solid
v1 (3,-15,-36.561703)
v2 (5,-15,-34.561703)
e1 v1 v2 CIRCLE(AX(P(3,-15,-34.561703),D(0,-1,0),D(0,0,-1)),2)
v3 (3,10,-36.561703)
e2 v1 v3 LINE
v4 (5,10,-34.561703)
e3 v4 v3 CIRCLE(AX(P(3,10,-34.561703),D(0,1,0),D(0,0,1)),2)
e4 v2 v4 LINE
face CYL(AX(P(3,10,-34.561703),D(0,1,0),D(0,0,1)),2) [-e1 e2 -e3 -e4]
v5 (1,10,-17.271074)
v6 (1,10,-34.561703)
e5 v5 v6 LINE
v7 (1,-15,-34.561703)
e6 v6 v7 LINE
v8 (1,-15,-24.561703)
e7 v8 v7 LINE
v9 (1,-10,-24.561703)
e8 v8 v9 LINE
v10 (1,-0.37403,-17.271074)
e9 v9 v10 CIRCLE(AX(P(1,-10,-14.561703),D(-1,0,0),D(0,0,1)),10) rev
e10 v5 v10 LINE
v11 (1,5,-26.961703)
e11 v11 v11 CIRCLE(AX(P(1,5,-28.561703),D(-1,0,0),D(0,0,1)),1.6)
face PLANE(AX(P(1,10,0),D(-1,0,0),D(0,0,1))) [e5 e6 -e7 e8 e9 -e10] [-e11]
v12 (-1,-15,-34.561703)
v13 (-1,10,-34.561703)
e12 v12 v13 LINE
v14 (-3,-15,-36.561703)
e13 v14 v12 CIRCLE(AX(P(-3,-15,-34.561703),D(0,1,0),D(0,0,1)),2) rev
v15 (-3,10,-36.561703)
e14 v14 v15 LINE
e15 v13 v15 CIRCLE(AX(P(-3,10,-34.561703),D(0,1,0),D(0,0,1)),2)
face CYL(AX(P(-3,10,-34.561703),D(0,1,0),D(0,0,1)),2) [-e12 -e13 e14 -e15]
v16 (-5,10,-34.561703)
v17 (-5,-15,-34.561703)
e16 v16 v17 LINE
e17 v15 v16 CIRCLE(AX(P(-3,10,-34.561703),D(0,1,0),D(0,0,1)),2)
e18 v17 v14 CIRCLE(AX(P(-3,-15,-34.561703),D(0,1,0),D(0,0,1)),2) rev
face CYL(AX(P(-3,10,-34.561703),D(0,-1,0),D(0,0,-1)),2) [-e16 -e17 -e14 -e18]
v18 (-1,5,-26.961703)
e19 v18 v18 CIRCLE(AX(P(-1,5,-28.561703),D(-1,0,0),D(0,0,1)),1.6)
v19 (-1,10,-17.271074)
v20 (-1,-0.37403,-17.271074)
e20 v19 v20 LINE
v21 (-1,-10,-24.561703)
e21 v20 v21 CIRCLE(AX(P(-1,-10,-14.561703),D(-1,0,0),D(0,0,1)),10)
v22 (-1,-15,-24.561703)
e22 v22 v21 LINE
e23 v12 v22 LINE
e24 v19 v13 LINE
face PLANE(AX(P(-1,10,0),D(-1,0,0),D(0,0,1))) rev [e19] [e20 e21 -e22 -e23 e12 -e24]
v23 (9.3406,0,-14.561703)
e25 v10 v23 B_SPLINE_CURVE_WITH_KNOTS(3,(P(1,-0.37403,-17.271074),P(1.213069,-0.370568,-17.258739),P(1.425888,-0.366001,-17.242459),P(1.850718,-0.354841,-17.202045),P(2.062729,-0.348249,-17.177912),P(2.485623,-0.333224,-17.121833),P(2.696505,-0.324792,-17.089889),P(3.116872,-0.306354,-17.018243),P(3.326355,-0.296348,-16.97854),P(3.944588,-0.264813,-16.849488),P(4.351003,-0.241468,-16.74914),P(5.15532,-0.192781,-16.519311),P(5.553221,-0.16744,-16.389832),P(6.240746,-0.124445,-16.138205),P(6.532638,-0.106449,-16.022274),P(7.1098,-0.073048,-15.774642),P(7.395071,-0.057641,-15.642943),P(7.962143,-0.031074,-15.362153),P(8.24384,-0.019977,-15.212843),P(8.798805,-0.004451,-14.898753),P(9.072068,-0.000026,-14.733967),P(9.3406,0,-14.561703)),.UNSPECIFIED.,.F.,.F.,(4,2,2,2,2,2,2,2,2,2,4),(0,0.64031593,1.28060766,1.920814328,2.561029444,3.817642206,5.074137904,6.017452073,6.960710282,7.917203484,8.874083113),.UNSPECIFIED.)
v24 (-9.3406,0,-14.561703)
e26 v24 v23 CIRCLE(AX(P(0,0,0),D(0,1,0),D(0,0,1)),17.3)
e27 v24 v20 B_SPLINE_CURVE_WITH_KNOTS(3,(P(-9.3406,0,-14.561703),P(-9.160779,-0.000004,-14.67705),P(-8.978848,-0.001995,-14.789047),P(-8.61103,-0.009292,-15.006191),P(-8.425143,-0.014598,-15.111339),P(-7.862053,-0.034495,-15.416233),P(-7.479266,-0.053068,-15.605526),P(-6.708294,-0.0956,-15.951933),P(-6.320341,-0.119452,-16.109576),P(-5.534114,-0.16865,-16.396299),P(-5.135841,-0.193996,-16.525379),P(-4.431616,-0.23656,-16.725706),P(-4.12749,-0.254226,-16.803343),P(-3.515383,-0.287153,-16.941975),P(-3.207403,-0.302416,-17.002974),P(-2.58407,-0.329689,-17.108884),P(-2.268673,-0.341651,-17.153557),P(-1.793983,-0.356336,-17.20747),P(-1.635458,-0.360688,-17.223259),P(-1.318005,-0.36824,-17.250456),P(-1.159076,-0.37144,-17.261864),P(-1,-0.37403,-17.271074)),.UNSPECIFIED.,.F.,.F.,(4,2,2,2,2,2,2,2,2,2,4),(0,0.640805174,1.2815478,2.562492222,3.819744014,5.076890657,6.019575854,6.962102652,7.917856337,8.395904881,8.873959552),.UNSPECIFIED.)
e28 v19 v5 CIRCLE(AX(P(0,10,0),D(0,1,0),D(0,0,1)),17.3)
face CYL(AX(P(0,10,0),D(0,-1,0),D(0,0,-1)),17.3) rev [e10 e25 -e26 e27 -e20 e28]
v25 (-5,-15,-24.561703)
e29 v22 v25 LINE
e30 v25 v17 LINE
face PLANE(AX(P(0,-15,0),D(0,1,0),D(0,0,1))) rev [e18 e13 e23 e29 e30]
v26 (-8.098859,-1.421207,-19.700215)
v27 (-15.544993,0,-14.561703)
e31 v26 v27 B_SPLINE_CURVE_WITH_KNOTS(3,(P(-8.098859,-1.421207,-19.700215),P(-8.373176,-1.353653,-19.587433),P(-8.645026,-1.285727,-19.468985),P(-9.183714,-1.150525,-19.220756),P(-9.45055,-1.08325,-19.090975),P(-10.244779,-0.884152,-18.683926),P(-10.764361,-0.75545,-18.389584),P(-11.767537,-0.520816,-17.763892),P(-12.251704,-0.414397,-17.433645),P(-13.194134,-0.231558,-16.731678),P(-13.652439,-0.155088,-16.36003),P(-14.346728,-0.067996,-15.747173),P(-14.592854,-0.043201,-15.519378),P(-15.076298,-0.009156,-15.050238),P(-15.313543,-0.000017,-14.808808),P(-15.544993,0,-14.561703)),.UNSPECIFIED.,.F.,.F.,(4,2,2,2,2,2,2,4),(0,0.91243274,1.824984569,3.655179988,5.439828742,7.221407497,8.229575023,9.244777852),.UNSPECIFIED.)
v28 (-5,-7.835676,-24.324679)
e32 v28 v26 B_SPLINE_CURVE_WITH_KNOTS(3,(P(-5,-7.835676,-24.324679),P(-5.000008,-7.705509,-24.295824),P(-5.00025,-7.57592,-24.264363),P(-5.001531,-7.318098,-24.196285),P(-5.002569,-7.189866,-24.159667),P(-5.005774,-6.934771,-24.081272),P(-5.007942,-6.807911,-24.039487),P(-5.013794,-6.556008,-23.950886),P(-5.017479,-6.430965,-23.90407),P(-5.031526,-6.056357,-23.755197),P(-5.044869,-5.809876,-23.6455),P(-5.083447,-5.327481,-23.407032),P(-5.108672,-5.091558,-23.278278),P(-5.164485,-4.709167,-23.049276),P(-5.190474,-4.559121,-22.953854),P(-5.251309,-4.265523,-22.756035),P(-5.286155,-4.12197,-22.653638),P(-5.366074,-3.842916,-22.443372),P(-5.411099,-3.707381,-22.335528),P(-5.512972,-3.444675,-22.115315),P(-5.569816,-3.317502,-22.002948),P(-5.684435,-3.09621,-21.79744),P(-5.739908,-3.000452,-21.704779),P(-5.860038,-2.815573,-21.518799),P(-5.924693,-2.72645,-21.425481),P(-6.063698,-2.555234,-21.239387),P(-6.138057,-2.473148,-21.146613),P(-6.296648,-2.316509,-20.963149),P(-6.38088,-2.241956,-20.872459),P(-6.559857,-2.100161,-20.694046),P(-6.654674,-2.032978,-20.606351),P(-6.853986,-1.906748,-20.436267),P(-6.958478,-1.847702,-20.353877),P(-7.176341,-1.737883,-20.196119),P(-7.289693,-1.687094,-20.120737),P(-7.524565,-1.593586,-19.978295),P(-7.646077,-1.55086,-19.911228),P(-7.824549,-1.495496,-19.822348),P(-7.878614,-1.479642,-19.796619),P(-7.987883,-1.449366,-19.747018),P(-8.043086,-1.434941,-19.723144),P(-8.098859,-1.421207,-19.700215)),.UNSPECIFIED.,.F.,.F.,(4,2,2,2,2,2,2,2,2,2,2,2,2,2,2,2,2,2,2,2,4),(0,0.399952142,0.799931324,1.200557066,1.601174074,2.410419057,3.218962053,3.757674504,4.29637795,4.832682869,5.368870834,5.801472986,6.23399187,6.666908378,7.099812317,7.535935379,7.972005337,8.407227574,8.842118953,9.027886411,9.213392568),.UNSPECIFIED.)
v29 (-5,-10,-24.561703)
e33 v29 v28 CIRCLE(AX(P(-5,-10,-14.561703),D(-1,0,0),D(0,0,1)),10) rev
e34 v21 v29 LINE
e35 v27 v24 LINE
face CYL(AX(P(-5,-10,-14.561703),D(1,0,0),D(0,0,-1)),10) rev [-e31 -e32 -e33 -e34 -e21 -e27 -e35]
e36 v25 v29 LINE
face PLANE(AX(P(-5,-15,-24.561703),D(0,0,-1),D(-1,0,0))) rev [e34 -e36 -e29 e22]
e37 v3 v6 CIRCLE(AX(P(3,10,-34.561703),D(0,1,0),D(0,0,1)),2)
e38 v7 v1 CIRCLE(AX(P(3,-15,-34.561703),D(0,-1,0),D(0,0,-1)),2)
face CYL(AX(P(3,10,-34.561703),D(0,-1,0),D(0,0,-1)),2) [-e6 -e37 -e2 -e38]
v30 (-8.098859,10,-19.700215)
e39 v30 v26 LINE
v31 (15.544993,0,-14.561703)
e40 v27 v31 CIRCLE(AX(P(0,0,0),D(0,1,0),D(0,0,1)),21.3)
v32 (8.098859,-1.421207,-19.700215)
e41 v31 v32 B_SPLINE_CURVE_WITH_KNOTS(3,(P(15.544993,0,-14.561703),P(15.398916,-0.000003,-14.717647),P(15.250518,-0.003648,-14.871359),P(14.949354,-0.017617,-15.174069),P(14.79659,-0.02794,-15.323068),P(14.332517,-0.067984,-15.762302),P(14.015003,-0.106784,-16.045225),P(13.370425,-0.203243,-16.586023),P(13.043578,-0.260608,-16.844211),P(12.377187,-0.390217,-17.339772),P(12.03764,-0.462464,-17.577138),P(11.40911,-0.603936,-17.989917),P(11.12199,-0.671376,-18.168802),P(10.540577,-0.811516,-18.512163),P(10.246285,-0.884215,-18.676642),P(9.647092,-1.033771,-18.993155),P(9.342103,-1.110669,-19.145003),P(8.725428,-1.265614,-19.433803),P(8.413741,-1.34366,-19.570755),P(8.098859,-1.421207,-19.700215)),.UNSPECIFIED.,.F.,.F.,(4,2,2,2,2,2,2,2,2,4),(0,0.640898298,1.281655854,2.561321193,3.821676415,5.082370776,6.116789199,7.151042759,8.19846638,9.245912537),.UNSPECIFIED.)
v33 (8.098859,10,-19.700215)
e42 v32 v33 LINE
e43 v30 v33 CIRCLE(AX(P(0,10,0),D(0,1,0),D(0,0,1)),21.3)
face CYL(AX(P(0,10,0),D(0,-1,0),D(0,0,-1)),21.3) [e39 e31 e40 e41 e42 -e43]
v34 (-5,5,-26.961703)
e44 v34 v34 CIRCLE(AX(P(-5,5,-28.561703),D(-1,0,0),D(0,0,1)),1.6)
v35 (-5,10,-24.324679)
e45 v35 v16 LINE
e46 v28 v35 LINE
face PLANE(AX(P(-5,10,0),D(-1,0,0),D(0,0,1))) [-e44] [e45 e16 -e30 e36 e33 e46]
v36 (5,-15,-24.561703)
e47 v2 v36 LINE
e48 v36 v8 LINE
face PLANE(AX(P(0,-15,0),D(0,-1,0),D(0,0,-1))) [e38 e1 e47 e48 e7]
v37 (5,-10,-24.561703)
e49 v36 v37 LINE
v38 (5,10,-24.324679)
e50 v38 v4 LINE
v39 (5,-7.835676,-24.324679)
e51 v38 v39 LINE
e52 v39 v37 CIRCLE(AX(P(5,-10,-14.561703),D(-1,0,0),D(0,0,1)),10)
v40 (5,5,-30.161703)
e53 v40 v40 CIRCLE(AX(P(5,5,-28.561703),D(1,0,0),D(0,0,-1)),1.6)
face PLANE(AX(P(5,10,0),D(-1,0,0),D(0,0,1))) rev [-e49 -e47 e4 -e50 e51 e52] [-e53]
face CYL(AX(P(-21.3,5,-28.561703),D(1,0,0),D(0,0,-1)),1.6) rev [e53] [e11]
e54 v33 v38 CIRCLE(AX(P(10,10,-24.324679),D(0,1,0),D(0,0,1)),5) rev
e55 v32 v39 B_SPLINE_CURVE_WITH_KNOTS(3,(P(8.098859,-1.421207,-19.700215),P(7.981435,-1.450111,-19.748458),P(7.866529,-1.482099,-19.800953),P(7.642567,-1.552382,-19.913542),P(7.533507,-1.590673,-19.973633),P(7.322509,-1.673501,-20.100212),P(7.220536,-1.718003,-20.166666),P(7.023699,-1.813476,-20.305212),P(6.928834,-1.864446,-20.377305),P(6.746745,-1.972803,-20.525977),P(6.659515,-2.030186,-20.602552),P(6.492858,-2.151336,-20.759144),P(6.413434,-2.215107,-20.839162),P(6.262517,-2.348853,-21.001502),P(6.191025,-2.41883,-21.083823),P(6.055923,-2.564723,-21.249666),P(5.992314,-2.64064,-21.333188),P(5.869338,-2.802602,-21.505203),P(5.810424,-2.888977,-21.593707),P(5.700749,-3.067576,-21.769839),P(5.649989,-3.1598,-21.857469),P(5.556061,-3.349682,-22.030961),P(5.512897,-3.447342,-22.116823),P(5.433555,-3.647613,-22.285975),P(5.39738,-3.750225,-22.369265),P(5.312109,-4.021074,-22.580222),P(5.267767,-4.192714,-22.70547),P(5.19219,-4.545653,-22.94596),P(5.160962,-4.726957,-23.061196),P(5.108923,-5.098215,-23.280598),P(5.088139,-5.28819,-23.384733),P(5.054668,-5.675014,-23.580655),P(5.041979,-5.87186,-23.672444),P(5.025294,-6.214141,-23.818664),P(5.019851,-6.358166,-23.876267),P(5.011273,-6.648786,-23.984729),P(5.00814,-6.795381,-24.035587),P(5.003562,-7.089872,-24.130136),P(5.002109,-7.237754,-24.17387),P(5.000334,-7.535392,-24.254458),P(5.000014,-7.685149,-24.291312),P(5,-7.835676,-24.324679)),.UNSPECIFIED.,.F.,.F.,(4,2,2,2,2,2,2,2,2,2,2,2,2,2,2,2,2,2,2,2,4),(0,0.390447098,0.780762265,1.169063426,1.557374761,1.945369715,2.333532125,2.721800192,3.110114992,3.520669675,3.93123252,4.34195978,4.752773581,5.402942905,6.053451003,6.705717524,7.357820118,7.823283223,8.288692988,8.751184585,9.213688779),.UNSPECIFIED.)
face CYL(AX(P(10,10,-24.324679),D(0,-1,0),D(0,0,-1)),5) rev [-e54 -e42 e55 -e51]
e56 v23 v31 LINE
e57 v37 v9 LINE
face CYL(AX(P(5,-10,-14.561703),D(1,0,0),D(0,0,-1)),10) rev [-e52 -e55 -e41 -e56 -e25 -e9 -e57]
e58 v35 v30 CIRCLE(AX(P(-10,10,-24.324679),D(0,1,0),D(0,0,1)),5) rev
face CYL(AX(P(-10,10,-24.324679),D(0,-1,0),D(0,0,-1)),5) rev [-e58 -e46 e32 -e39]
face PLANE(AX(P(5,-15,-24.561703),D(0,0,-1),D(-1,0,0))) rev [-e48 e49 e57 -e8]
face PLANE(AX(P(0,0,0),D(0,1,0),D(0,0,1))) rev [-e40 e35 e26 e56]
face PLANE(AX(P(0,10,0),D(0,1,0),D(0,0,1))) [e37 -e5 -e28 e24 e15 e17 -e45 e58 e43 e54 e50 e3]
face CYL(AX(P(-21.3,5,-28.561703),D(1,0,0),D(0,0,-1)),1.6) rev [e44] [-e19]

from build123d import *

# Parameters (mm, degrees)
BOSS_EXTRUDE4_DEPTH = 10
SKETCH6_R           = 1.6
CUT_EXTRUDE2_DEPTH  = 47.135107158
FILLET4_R           = 5
SKETCH7_W           = 4
SKETCH7_H           = 12
BOSS_EXTRUDE5_DEPTH = 15
FILLET5_START       = -10.0000001
FILLET5_DEPTH       = 10.0000001
FILLET5_START_2     = -22
FILLET5_2_DEPTH     = 44
FILLET6_R           = 2


with BuildPart() as part:
    # Sketch5 → Boss-Extrude4 (new body)
    with BuildSketch(Plane(origin=(0, 0, 0), x_dir=(1, 0, 0), z_dir=(0, 1, 0))):
        with BuildLine():
            ThreePointArc((17.3, 0), (-10.314795199, -13.888664443), (-5, 16.561702811))
            Line((-5, 16.561702811), (-5, 20.704830354))
            ThreePointArc((-5, 20.704830354), (-13.17554553, -16.736038958), (21.3, 0))
            ThreePointArc((21.3, 0), (16.736038958, 13.17554553), (5, 20.704830354))
            Line((5, 20.704830354), (5, 16.561702811))
            ThreePointArc((5, 16.561702811), (13.888664443, 10.314795199), (17.3, 0))
        make_face()
        with BuildLine():
            ThreePointArc((-5, 20.704830354), (-3.013586771, 21.085736761), (-1, 21.276512872))
            Line((-1, 21.276512872), (-1, 36.561702811))
            Line((-1, 36.561702811), (-5, 36.561702811))
            Line((-5, 36.561702811), (-5, 20.704830354))
        make_face()
        with BuildLine():
            ThreePointArc((-5, 16.561702811), (-3.020894222, 17.034206706), (-1, 17.271074084))
            Line((-1, 17.271074084), (-1, 21.276512872))
            ThreePointArc((-1, 21.276512872), (-3.013586771, 21.085736761), (-5, 20.704830354))
            Line((-5, 20.704830354), (-5, 16.561702811))
        make_face()
        with BuildLine():
            Line((1, 21.276512872), (1, 17.271074084))
            ThreePointArc((1, 17.271074084), (3.020894222, 17.034206706), (5, 16.561702811))
            Line((5, 16.561702811), (5, 20.704830354))
            ThreePointArc((5, 20.704830354), (3.013586771, 21.085736761), (1, 21.276512872))
        make_face()
        with BuildLine():
            Line((1, 36.561702811), (1, 21.276512872))
            ThreePointArc((1, 21.276512872), (3.013586771, 21.085736761), (5, 20.704830354))
            Line((5, 20.704830354), (5, 36.561702811))
            Line((5, 36.561702811), (1, 36.561702811))
        make_face()
    extrude(amount=BOSS_EXTRUDE4_DEPTH)

    # Sketch6 → Cut-Extrude2 (cut, through all)
    with BuildSketch(Plane(origin=(5, 0, 0), x_dir=(0, 0, -1), z_dir=(1, 0, 0))):
        with Locations((28.561702811, 5)):
            Circle(SKETCH6_R)
    extrude(amount=-CUT_EXTRUDE2_DEPTH, mode=Mode.SUBTRACT)

    # Fillet4
    fillet4_edges = [part.edges().sort_by_distance(p)[0] for p in [
        (5, 5, -20.704830354),
        (-5, 5, -20.704830354),
    ]]
    fillet(fillet4_edges, radius=FILLET4_R)

    # Sketch7 → Boss-Extrude5 (add)
    with BuildSketch(Plane.XZ):
        with Locations((-3, -30.561702811)):
            Rectangle(SKETCH7_W, SKETCH7_H)
        with Locations((3, -30.561702811)):
            Rectangle(SKETCH7_W, SKETCH7_H)
    extrude(amount=BOSS_EXTRUDE5_DEPTH)

    # Fillet5: read off the stored shape, not the designer's step
    # Fillet5 outline → Fillet5 (add)
    with BuildSketch(Plane(origin=(0, 0, 0), x_dir=(1, 0, 0), z_dir=(0, 1, 0)).offset(FILLET5_START)):
        with BuildLine():
            Line((-1, 17.271074084), (-1, 24.561702811))
            Line((-1, 24.561702811), (-5, 24.561702811))
            Line((-5, 24.561702811), (-5, 24.324678826))
            ThreePointArc((-5, 24.324678826), (-5.846344777, 21.541308874), (-8.098859316, 19.700215171))
            ThreePointArc((-8.098859316, 19.700215171), (0, -21.3), (8.098859316, 19.700215171))
            ThreePointArc((8.098859316, 19.700215171), (5.846344777, 21.541308874), (5, 24.324678826))
            Line((5, 24.324678826), (5, 24.561702811))
            Line((5, 24.561702811), (1, 24.561702811))
            Line((1, 24.561702811), (1, 17.271074084))
            ThreePointArc((1, 17.271074084), (0, -17.3), (-1, 17.271074084))
        make_face()
    extrude(amount=FILLET5_DEPTH)

    # Fillet5 2 outline → Fillet5 2 (cut)
    with BuildSketch(Plane.YZ.offset(FILLET5_START_2)):
        with BuildLine():
            ThreePointArc((-10, -24.561702811), (-2.928932188, -21.632770623), (0, -14.561702811))
            Line((0, -14.561702811), (0, 23))
            Line((0, 23), (-10.0000001, 23))
            Line((-10.0000001, 23), (-10, -24.561702811))
        make_face()
    extrude(amount=FILLET5_2_DEPTH, mode=Mode.SUBTRACT)

    # Fillet6
    fillet6_edges = [part.edges().sort_by_distance(p)[0] for p in [
        (5, -2.5, -36.561702811),
        (1, -2.5, -36.561702811),
        (-1, -2.5, -36.561702811),
        (-5, -2.5, -36.561702811),
    ]]
    fillet(fillet6_edges, radius=FILLET6_R - 0.0001)  # a hair under: the kernel refuses the full size


solid = part.part
